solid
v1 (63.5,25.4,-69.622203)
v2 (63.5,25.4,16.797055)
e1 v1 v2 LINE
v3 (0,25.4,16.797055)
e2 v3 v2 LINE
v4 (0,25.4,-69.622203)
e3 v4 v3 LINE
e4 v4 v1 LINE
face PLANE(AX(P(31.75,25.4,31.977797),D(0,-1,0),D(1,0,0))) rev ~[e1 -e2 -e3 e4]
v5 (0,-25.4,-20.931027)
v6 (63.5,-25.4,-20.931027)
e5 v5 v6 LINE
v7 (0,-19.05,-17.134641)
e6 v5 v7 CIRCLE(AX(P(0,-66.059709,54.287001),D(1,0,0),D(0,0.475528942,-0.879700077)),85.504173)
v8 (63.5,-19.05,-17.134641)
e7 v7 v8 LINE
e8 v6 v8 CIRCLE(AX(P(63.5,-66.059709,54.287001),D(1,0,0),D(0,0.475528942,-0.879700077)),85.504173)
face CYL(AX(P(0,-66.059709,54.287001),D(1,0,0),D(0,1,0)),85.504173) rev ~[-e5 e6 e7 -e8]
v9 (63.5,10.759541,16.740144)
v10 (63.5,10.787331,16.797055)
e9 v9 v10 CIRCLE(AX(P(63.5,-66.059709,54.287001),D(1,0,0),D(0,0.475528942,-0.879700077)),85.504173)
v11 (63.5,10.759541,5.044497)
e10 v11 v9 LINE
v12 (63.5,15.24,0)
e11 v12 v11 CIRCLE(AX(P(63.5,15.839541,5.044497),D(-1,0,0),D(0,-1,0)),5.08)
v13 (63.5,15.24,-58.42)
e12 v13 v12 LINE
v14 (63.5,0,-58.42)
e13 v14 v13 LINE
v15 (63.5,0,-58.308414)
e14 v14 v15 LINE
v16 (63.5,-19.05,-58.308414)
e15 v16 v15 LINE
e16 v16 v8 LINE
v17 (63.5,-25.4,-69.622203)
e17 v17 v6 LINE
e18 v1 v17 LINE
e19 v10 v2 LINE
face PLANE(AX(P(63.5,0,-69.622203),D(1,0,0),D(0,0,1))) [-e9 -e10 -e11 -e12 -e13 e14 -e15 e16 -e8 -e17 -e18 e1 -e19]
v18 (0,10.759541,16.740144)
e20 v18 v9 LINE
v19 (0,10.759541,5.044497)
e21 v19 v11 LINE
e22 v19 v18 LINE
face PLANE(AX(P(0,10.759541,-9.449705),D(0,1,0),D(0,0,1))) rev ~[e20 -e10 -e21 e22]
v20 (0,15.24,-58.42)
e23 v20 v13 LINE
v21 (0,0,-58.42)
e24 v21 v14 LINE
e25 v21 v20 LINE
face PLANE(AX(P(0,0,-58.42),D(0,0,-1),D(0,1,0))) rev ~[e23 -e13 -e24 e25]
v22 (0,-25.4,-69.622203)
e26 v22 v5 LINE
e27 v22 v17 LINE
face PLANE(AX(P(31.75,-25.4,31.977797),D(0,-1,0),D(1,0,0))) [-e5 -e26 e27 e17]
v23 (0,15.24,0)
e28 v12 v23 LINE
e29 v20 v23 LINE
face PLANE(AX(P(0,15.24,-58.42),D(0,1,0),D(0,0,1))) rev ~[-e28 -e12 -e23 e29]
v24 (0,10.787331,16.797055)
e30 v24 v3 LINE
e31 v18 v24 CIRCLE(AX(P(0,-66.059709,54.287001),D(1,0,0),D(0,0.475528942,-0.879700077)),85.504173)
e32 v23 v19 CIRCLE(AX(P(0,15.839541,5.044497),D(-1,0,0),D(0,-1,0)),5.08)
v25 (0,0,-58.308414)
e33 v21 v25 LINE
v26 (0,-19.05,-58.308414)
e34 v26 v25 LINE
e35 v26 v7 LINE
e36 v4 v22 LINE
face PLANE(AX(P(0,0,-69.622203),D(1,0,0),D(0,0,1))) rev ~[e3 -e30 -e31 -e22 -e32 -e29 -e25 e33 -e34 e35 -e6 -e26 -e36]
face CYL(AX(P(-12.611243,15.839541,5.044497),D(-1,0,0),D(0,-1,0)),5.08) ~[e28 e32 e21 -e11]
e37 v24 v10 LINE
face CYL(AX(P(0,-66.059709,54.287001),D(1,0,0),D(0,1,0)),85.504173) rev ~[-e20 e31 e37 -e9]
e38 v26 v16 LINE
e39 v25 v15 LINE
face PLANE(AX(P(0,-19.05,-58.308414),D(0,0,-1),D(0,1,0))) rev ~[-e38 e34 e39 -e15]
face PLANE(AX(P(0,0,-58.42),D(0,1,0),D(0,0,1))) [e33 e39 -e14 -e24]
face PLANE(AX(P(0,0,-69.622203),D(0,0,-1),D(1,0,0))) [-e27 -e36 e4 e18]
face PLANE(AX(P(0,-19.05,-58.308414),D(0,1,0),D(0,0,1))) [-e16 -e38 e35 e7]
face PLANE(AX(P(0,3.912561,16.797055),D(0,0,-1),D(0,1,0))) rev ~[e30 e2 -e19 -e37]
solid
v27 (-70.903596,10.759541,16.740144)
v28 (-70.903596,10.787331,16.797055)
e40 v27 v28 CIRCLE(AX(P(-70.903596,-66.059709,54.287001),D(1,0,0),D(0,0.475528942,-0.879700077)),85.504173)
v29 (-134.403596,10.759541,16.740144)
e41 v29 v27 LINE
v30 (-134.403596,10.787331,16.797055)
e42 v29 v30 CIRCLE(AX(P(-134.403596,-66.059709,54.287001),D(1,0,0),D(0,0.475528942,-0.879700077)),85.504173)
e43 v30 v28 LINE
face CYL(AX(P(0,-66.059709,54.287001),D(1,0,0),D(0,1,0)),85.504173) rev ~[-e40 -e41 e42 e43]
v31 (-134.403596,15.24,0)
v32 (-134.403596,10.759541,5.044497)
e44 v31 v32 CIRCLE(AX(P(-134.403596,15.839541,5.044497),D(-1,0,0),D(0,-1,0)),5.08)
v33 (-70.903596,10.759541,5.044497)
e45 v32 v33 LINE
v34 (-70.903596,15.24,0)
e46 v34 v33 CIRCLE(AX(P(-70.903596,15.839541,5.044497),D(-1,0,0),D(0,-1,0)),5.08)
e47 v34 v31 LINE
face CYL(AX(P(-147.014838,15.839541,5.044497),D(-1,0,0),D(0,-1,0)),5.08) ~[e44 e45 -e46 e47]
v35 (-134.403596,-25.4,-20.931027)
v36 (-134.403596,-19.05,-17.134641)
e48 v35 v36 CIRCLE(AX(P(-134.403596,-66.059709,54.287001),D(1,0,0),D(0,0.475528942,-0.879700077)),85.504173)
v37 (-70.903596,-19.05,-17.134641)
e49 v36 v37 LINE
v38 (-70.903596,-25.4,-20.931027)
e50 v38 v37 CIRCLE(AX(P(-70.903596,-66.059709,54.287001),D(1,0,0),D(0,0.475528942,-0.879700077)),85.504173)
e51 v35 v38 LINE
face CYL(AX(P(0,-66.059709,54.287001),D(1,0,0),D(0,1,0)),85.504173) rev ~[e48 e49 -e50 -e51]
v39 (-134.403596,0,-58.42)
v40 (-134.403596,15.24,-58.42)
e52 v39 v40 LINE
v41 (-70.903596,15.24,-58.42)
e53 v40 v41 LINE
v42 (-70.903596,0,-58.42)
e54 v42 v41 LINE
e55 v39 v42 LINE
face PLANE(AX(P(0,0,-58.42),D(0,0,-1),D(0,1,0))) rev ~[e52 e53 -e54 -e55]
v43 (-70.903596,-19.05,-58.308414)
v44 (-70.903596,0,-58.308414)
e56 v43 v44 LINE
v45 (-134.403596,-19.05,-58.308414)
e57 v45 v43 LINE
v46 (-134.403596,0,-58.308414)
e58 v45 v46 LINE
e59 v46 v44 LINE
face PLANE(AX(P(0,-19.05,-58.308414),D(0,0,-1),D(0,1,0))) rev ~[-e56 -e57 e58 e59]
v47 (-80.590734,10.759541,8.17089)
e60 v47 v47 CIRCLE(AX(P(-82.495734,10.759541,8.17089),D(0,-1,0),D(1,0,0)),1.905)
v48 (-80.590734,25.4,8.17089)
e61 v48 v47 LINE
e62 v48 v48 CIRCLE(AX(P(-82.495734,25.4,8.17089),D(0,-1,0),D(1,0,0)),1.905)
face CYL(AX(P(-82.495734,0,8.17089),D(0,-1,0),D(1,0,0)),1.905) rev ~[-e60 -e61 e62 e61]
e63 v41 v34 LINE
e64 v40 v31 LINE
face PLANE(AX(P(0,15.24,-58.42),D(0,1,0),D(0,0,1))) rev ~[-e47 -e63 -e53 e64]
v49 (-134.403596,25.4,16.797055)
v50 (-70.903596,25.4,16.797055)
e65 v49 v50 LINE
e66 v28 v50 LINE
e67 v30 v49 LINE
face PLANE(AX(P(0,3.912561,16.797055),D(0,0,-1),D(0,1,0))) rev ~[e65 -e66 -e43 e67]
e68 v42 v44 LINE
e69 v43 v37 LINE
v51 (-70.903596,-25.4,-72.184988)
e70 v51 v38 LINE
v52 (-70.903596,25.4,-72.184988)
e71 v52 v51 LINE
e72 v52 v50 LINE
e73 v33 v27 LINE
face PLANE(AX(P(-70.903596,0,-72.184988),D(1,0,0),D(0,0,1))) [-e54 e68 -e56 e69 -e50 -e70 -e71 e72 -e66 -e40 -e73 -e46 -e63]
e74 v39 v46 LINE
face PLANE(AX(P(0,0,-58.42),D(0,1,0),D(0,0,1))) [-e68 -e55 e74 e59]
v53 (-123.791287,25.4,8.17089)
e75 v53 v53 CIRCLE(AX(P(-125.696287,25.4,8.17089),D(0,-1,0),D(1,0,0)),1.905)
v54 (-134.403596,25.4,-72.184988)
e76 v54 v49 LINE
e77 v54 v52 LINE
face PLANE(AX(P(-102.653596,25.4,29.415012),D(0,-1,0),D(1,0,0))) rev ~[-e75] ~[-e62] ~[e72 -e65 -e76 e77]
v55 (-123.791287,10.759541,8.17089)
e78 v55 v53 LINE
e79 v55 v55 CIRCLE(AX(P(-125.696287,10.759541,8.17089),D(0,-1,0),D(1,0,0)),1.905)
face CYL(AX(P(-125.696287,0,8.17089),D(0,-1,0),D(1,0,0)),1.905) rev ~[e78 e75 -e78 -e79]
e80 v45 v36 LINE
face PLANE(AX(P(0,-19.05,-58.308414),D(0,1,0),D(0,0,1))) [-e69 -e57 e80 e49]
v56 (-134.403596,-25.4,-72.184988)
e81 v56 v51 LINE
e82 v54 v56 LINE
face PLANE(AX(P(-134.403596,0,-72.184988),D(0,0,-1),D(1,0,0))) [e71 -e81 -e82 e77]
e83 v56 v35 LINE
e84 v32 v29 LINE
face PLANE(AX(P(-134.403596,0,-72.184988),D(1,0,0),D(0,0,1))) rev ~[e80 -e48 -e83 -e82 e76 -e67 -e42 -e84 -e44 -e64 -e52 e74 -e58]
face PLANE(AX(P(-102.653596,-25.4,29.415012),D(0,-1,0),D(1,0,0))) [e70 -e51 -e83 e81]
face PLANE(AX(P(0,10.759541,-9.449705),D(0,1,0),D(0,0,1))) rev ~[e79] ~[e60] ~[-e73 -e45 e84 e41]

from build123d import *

# Parameters (mm, degrees)
F0_W           = 63.5
F0_H           = 203.2
F1_DEPTH       = 25.4
F2_R           = 5.08
F2_2_R         = 5.08
F3_R           = 85.5041731658
F4_DEPTH       = 152.4
F5_W           = 19.05
F5_H           = 58.3084138111
F6_DEPTH       = 190.5
F7_W           = 15.24
F7_H           = 58.42
F8_DEPTH       = 190.5
F9_R           = 5.08
F9_2_R         = 5.08
F10_W          = 137.1934004128
F10_H          = 115.8126294613
F11_DEPTH      = 635
F12_W          = 13.0418678746
F12_H          = 28.3660627902
F13_DEPTH      = 254
F14_W          = 37.495367229
F14_H          = 80.2074819803
F15_DEPTH      = 254
F16_R          = 1.905
F17_DEPTH      = 127
F18_T1_DEPTH   = 88.7224853994
F18_2_T1_DEPTH = 88.7224853994


# Not quite as in the source:
# - a fillet or chamfer that OpenCascade refuses, or shapes differently, is made with other operations: its cross-section is extruded or revolved along the edge and cut away or added


with BuildPart() as f1:
    # F0 (on Front) → F1 (new body, symmetric)
    with BuildSketch(Plane.XZ):
        with Locations((-102.6535956171, 29.415011573)):
            Rectangle(F0_W, F0_H)
    extrude(amount=F1_DEPTH, both=True)

    # F2
    f2_edges = [f1.edges().sort_by_distance(p)[0] for p in [
        (-102.653596, -25.4, 131.015012),
    ]]
    fillet(f2_edges, radius=F2_R)


with BuildPart() as f1b:
    # F0 (on Front) → F1, piece 2 (new body, symmetric)
    with BuildSketch(Plane.XZ):
        with Locations((31.75, 31.9777971928)):
            Rectangle(F0_W, F0_H)
    extrude(amount=F1_DEPTH, both=True)

    # F2#2
    f2_2_edges = [f1b.edges().sort_by_distance(p)[0] for p in [
        (31.75, -25.4, 133.577797),
    ]]
    fillet(f2_2_edges, radius=F2_2_R)


with BuildPart() as f4_tool:
    # F3 (on Right) → F4 (new body, symmetric)
    with BuildSketch(Plane.YZ):
        with Locations((-66.0597089804, 54.2870010056)):
            Circle(F3_R)
    extrude(amount=F4_DEPTH, both=True)


with BuildPart() as f1_1:
    add(f1.part)

    # F4: cut by f4_tool
    add(f4_tool.part, mode=Mode.SUBTRACT)


with BuildPart() as f1b_1:
    add(f1b.part)

    # F4: cut by f4_tool
    add(f4_tool.part, mode=Mode.SUBTRACT)


with BuildPart() as f6_tool:
    # F5 (on Right) → F6 (new body, symmetric)
    with BuildSketch(Plane.YZ):
        with Locations((-9.525, -29.1542069055)):
            Rectangle(F5_W, F5_H)
    extrude(amount=F6_DEPTH, both=True)


with BuildPart() as f1_2:
    add(f1_1.part)

    # F6: cut by f6_tool
    add(f6_tool.part, mode=Mode.SUBTRACT)


with BuildPart() as f1b_2:
    add(f1b_1.part)

    # F6: cut by f6_tool
    add(f6_tool.part, mode=Mode.SUBTRACT)


with BuildPart() as f8_tool:
    # F7 (on Right) → F8 (new body, symmetric)
    with BuildSketch(Plane.YZ):
        with Locations((7.62, -29.21)):
            Rectangle(F7_W, F7_H)
    extrude(amount=F8_DEPTH, both=True)


with BuildPart() as f1_3:
    add(f1_2.part)

    # F8: cut by f8_tool
    add(f8_tool.part, mode=Mode.SUBTRACT)

    # F9
    f9_edges = [f1_3.edges().sort_by_distance(p)[0] for p in [
        (-102.653596, 0, 0),
    ]]
    fillet(f9_edges, radius=F9_R)


with BuildPart() as f1b_3:
    add(f1b_2.part)

    # F8: cut by f8_tool
    add(f8_tool.part, mode=Mode.SUBTRACT)

    # F9#2
    f9_2_edges = [f1b_3.edges().sort_by_distance(p)[0] for p in [
        (31.75, 0, 0),
    ]]
    fillet(f9_2_edges, radius=F9_2_R)


with BuildPart() as f11_tool:
    # F10 (on Right) → F11 (new body, symmetric)
    with BuildSketch(Plane.YZ):
        with Locations((25.8351210505, 135.2587789297)):
            Rectangle(F10_W, F10_H)
    extrude(amount=F11_DEPTH, both=True)


with BuildPart() as f1_4:
    add(f1_3.part)

    # F11: cut by f11_tool
    add(f11_tool.part, mode=Mode.SUBTRACT)


with BuildPart() as f1b_4:
    add(f1b_3.part)

    # F11: cut by f11_tool
    add(f11_tool.part, mode=Mode.SUBTRACT)


with BuildPart() as f13_tool:
    # F12 (on Right) → F13 (new body, symmetric)
    with BuildSketch(Plane.YZ):
        with Locations((4.2386068963, 4.7333268449)):
            Rectangle(F12_W, F12_H)
    extrude(amount=F13_DEPTH, both=True)


with BuildPart() as f1_5:
    add(f1_4.part)

    # F13: cut by f13_tool
    add(f13_tool.part, mode=Mode.SUBTRACT)


with BuildPart() as f1b_5:
    add(f1b_4.part)

    # F13: cut by f13_tool
    add(f13_tool.part, mode=Mode.SUBTRACT)


with BuildPart() as f15_tool:
    # F14 (on Right) → F15 (new body, symmetric)
    with BuildSketch(Plane.YZ):
        with Locations((22.6602442563, 56.9007955492)):
            Rectangle(F14_W, F14_H)
    extrude(amount=F15_DEPTH, both=True)


with BuildPart() as f1_6:
    add(f1_5.part)

    # F15: cut by f15_tool
    add(f15_tool.part, mode=Mode.SUBTRACT)

    # F16 (on Front) → F17 (cut, symmetric)
    with BuildSketch(Plane.XZ):
        with Locations((-125.6962865591, 8.1708896905)):
            Circle(F16_R)
        with Locations((-82.4957340956, 8.1708896905)):
            Circle(F16_R)
    extrude(amount=F17_DEPTH, both=True, mode=Mode.SUBTRACT)

    # F18: fillet of radius 5.08 on 1 edges, made by hand

    # F18_s2 → F18_t1 (cut)
    with BuildSketch(Plane.YZ.offset(-147.0148383168)):
        with BuildLine():
            ThreePointArc((10.7595408335, 5.0444970799), (12.0413789469, 1.6710172322), (15.24, 0))
            Line((15.24, 0), (10.7595408335, 0))
            Line((10.7595408335, 0), (10.7595408335, 5.0444970799))
        make_face()
    extrude(amount=F18_T1_DEPTH, mode=Mode.SUBTRACT)


with BuildPart() as f1b_6:
    add(f1b_5.part)

    # F15: cut by f15_tool
    add(f15_tool.part, mode=Mode.SUBTRACT)

    # F18#2: fillet of radius 5.08 on 1 edges, made by hand

    # F18_2_s2 → F18_2_t1 (cut)
    with BuildSketch(Plane.YZ.offset(-12.6112426997)):
        with BuildLine():
            ThreePointArc((10.7595408335, 5.0444970799), (12.0413789469, 1.6710172322), (15.24, 0))
            Line((15.24, 0), (10.7595408335, 0))
            Line((10.7595408335, 0), (10.7595408335, 5.0444970799))
        make_face()
    extrude(amount=F18_2_T1_DEPTH, mode=Mode.SUBTRACT)


solid = Compound([f1_6.part, f1b_6.part])
